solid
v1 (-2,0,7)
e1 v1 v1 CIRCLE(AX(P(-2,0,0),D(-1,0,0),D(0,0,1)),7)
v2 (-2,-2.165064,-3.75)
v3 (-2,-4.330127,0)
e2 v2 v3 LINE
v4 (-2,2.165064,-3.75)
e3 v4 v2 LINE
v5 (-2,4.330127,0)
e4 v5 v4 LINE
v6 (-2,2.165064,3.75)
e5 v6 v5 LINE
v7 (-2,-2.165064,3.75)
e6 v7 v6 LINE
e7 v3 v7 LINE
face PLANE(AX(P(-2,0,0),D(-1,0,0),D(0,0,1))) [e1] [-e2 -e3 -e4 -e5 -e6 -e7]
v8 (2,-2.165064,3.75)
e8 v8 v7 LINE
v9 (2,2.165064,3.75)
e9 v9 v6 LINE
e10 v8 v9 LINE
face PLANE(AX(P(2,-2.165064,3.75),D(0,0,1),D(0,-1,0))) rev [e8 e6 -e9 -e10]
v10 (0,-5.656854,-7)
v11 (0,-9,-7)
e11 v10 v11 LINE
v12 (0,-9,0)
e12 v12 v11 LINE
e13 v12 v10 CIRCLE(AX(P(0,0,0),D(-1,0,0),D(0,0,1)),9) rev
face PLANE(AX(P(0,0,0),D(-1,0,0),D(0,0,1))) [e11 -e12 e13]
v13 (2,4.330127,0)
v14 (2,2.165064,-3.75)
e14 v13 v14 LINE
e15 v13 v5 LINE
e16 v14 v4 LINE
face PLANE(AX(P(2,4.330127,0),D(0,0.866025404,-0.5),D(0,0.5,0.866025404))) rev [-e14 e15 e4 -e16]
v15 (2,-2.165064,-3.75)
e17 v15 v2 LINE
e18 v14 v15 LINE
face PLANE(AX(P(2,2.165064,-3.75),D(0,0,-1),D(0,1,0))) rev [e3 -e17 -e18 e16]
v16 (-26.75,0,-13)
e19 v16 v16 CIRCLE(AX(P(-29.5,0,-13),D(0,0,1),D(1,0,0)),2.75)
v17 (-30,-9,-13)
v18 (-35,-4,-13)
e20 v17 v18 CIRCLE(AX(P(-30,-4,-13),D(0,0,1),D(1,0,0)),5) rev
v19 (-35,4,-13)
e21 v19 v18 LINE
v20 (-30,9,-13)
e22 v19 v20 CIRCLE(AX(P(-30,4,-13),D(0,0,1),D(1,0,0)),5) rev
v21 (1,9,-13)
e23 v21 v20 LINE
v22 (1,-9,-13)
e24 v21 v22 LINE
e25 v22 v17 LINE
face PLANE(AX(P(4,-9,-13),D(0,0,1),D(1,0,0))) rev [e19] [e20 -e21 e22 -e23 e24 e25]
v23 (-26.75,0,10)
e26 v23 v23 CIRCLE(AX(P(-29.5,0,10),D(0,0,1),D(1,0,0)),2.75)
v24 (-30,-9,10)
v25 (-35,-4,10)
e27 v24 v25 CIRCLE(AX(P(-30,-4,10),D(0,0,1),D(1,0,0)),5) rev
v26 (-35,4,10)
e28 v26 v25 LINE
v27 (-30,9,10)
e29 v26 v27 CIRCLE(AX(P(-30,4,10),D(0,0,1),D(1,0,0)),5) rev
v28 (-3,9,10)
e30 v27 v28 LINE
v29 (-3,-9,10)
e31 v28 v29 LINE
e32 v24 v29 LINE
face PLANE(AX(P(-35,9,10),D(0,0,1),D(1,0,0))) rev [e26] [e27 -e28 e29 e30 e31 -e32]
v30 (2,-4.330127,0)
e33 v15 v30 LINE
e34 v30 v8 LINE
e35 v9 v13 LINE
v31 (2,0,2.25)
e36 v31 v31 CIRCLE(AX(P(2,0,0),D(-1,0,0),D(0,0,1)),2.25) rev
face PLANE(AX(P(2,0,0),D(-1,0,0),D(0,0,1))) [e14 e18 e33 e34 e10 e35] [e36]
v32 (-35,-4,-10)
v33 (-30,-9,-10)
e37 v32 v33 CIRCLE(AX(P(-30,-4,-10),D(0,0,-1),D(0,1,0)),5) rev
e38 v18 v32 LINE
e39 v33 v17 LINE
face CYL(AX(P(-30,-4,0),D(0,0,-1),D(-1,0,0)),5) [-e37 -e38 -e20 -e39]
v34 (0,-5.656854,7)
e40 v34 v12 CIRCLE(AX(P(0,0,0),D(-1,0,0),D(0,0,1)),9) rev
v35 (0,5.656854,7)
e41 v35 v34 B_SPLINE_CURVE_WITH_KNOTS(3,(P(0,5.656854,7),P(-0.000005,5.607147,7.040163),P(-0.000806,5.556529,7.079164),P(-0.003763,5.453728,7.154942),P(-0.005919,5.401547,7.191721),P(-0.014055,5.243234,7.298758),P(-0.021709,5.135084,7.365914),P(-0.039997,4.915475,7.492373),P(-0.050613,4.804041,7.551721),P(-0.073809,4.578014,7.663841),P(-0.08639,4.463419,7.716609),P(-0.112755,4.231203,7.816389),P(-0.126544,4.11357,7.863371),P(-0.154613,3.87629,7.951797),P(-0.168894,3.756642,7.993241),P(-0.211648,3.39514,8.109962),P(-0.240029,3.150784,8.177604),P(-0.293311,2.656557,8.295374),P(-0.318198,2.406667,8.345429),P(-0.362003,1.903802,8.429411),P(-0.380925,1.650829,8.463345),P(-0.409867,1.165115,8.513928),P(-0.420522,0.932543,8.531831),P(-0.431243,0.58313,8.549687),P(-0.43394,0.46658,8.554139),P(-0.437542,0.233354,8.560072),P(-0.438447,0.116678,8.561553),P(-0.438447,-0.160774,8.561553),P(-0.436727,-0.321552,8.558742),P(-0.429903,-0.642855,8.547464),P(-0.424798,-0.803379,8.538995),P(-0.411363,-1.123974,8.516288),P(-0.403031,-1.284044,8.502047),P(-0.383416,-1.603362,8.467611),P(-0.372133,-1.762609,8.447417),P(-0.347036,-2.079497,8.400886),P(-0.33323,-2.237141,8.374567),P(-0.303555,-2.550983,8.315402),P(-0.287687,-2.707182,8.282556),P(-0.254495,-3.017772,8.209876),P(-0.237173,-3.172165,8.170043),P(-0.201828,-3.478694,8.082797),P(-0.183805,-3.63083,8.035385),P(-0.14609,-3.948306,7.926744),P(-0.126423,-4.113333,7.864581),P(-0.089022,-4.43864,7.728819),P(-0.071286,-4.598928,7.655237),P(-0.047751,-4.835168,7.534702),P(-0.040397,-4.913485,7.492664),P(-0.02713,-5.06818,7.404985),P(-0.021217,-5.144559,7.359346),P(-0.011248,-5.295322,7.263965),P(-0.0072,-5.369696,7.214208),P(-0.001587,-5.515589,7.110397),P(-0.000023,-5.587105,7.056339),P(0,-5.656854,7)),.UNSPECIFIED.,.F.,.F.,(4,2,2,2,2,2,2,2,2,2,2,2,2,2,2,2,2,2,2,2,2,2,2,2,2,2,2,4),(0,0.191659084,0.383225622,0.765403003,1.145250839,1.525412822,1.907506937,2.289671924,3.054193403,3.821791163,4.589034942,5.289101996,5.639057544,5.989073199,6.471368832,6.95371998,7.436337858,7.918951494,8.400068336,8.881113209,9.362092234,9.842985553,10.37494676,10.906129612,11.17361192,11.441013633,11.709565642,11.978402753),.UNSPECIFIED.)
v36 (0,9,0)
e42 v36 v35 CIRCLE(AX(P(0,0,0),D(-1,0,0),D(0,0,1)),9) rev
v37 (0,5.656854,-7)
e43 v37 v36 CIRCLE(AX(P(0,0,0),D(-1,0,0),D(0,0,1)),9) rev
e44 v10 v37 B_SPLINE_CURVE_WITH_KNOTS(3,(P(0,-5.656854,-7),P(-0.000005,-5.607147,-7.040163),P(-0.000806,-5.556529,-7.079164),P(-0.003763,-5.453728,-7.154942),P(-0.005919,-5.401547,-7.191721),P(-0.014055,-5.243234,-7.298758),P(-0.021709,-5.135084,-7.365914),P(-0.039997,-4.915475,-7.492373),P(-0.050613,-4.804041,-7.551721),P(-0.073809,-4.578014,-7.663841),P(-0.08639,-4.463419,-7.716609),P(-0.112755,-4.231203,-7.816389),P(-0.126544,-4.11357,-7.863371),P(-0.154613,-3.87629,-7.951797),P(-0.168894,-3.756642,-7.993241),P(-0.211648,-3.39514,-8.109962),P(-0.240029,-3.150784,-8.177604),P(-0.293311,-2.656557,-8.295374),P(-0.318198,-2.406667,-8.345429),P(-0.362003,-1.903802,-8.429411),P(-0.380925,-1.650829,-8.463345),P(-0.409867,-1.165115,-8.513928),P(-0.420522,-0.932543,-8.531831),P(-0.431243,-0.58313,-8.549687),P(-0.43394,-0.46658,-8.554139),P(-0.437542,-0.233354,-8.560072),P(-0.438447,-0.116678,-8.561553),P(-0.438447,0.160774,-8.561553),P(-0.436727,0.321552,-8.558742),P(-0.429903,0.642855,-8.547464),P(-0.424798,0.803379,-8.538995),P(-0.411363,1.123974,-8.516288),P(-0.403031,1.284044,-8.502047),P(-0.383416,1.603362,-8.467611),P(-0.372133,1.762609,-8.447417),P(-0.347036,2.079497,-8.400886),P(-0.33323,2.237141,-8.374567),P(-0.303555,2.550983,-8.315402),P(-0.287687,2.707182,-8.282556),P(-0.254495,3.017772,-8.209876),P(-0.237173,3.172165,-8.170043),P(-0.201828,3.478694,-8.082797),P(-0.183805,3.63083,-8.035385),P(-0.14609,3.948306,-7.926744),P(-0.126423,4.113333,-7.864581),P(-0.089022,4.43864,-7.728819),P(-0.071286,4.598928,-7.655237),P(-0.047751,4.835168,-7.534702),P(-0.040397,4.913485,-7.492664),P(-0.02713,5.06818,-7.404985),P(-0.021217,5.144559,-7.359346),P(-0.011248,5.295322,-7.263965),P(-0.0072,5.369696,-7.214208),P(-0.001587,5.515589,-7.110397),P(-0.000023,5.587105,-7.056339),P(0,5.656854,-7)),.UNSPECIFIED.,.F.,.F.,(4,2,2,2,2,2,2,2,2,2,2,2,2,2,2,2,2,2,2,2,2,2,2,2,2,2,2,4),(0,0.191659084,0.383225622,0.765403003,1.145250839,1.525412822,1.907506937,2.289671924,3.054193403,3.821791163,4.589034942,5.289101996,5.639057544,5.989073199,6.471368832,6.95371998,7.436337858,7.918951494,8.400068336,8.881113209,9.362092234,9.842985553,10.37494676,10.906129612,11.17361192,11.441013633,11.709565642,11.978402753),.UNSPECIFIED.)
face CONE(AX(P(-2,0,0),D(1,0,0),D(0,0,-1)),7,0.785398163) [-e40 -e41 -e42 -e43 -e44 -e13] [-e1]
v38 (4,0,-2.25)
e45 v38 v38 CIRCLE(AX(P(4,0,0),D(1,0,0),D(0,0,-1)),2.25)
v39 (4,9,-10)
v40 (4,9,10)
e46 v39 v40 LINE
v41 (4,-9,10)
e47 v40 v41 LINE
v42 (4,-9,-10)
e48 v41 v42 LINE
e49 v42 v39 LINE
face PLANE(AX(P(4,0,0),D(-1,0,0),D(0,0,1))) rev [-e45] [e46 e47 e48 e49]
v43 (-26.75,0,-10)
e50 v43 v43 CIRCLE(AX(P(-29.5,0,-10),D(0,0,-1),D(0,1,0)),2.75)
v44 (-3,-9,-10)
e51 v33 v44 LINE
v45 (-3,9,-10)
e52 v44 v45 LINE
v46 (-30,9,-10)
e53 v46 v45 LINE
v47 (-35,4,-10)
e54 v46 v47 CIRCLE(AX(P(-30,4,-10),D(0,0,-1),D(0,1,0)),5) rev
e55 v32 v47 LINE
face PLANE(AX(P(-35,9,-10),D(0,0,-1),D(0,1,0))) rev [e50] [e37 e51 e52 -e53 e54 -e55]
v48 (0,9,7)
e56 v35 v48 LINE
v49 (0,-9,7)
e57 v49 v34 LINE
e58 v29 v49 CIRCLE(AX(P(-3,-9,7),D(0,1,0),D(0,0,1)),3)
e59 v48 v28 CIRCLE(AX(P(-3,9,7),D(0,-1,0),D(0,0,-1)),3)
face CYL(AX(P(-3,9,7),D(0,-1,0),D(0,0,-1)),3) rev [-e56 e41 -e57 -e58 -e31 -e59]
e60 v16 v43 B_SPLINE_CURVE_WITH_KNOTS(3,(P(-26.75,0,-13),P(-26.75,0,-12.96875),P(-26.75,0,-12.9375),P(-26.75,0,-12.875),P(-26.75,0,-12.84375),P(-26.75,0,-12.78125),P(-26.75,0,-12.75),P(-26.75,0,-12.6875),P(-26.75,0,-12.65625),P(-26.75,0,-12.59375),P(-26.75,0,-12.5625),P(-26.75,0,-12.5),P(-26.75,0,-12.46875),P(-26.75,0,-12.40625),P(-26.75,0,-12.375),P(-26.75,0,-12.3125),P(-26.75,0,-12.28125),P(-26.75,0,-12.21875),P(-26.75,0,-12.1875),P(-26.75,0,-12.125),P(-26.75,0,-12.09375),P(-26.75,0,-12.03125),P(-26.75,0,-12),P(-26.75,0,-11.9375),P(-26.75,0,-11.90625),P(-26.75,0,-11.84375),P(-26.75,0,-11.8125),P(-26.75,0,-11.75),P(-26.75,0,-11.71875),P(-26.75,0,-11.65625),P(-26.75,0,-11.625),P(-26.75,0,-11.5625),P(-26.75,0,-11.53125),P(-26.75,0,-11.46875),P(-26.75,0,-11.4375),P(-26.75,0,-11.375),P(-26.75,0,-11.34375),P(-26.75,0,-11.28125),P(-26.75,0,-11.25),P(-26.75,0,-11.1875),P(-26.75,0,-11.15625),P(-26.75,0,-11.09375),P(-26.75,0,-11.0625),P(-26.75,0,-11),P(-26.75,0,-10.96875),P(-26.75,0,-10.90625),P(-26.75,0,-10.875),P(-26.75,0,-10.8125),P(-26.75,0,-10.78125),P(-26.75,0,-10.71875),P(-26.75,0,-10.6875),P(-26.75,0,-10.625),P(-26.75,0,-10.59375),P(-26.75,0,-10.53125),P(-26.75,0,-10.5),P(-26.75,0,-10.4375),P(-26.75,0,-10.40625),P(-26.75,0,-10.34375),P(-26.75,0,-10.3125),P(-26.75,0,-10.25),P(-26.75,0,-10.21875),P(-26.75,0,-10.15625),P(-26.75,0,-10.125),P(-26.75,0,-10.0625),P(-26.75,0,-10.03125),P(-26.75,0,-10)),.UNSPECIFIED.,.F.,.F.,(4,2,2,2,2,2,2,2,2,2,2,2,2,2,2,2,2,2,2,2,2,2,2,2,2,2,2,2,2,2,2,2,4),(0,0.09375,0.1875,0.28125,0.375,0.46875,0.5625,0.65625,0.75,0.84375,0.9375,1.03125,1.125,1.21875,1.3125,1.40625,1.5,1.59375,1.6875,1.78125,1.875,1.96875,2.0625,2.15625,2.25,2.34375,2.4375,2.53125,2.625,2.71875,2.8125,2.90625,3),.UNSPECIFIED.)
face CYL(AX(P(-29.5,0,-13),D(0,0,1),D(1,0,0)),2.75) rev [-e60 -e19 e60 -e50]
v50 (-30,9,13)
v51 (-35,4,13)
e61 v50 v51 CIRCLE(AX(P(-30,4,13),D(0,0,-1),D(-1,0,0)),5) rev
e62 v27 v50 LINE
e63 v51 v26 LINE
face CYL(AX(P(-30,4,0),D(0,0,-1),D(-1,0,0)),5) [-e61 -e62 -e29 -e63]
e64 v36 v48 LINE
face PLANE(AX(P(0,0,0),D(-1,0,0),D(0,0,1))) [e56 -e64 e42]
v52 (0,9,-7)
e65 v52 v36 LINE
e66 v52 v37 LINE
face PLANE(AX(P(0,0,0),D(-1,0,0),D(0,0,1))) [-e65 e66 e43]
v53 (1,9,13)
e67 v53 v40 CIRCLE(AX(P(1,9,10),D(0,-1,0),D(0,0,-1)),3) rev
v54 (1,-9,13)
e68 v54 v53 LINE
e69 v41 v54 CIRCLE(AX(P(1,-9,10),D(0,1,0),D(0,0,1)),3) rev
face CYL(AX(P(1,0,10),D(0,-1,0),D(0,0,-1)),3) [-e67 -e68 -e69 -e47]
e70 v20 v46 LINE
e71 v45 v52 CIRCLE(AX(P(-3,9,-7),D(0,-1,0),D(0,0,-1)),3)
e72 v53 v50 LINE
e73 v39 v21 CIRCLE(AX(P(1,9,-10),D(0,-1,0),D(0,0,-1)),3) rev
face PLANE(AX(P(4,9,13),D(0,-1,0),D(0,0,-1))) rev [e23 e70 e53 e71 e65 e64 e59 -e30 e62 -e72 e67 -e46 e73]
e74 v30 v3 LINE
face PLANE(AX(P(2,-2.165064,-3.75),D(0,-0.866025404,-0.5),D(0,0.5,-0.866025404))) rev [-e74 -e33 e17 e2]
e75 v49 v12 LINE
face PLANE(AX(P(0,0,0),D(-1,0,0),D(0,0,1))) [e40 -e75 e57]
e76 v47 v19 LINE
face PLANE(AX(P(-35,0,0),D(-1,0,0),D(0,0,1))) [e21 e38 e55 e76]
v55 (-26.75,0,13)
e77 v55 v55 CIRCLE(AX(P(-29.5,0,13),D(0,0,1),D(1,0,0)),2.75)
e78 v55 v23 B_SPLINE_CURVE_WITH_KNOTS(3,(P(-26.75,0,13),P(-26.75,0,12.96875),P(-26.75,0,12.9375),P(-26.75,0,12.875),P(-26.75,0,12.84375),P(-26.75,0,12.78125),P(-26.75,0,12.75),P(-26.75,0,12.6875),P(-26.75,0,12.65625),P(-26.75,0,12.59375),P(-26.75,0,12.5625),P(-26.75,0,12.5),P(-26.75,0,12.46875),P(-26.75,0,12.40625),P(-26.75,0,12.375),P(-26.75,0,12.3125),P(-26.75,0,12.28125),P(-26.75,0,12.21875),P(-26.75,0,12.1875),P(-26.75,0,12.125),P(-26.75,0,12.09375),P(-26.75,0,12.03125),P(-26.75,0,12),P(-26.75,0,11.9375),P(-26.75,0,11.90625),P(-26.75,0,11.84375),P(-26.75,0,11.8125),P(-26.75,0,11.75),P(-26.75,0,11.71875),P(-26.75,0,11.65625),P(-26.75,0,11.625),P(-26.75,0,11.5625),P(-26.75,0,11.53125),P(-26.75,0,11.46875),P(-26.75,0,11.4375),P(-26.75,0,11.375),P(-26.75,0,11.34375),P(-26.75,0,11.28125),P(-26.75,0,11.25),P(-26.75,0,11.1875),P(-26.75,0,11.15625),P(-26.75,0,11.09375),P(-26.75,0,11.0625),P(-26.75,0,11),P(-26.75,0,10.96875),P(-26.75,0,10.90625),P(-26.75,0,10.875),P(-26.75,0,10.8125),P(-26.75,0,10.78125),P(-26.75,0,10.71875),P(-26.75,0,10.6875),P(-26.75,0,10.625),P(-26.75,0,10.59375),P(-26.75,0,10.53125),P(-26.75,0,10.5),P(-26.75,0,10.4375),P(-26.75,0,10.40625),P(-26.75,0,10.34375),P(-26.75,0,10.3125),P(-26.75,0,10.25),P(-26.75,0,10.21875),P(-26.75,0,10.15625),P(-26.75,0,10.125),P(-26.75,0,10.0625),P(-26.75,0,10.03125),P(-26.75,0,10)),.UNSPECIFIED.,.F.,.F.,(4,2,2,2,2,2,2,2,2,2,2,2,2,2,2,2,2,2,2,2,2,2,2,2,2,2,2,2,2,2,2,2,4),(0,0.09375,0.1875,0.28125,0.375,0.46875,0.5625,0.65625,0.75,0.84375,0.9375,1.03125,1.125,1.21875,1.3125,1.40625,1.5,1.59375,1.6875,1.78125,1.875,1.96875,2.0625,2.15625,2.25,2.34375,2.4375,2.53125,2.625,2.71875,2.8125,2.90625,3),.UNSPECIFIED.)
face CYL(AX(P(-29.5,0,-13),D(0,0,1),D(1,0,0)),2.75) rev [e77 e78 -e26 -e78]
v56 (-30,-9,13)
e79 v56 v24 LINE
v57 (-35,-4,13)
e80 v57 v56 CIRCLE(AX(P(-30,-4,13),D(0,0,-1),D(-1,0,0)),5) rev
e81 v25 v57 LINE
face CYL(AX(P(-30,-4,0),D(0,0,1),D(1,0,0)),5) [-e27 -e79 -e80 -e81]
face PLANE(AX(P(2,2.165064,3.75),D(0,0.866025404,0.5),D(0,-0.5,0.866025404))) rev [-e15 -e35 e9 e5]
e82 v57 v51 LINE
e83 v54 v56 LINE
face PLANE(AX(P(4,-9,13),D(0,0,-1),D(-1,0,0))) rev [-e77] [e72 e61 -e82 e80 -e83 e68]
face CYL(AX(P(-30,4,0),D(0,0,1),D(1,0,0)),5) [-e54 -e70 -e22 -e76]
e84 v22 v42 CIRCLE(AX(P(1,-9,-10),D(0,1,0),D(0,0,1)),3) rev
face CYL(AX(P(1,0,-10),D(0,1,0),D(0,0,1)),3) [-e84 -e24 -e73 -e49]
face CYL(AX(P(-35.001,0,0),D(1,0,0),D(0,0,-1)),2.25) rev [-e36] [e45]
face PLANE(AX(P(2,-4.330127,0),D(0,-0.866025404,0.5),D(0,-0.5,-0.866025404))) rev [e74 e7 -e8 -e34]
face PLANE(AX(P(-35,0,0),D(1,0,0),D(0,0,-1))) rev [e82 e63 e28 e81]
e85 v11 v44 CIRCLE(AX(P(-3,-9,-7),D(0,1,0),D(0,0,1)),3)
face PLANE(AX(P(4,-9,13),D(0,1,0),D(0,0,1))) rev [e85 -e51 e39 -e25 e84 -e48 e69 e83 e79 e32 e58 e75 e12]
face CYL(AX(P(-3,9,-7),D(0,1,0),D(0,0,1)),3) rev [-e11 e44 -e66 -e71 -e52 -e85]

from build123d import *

# Parameters (mm, degrees)
SKETCH1_W           = 26
SKETCH1_H           = 18
BOSS_EXTRUDE1_DEPTH = 4
SKETCH2_W           = 3
SKETCH2_H           = 18
BOSS_EXTRUDE2_DEPTH = 35
SKETCH3_R           = 2.75
CUT_EXTRUDE1_DEPTH  = 45.519658579
FILLET1_R           = 3
FILLET2_R           = 5
SKETCH5_R           = 7
BOSS_EXTRUDE3_DEPTH = 2
CUT_EXTRUDE3_REACH  = 44.083
SKETCH7_R           = 2.25
CUT_EXTRUDE4_DEPTH  = 4
CHAMFER1_SIZE       = 2


with BuildPart() as part:
    # Sketch1 → Boss-Extrude1 (new body)
    with BuildSketch(Plane(origin=(0, 0, 0), x_dir=(0, 0, -1), z_dir=(1, 0, 0))):
        Rectangle(SKETCH1_W, SKETCH1_H)
    extrude(amount=BOSS_EXTRUDE1_DEPTH)

    # Sketch2 → Boss-Extrude2 (add)
    with BuildSketch(Plane.ZY):
        with Locations((-11.5, 0)):
            Rectangle(SKETCH2_W, SKETCH2_H)
        with Locations((11.5, 0)):
            Rectangle(SKETCH2_W, SKETCH2_H)
    extrude(amount=BOSS_EXTRUDE2_DEPTH)

    # Sketch3 → Cut-Extrude1 (cut, through all)
    with BuildSketch(Plane.XY.offset(13)):
        with Locations((-29.5, 0)):
            Circle(SKETCH3_R)
    extrude(amount=-CUT_EXTRUDE1_DEPTH, mode=Mode.SUBTRACT)

    # Fillet1
    fillet1_edges = [part.edges().sort_by_distance(p)[0] for p in [
        (4, 0, 13),
        (0, 0, -10),
        (0, 0, 10),
        (4, 0, -13),
    ]]
    fillet(fillet1_edges, radius=FILLET1_R)

    # Fillet2
    fillet2_edges = [part.edges().sort_by_distance(p)[0] for p in [
        (-35, -9, -11.5),
        (-35, 9, -11.5),
        (-35, 9, 11.5),
        (-35, -9, 11.5),
    ]]
    fillet(fillet2_edges, radius=FILLET2_R)

    # Sketch5 → Boss-Extrude3 (add)
    with BuildSketch(Plane.ZY):
        Circle(SKETCH5_R)
    extrude(amount=BOSS_EXTRUDE3_DEPTH)

    # Sketch7 → Cut-Extrude3 (cut, up to next)
    with BuildSketch(Plane(origin=(4, 0, 0), x_dir=(0, 0, -1), z_dir=(1, 0, 0)), mode=Mode.PRIVATE) as cut_extrude3_sk1:
        Circle(SKETCH7_R)
    cut_extrude3_tool1 = extrude(cut_extrude3_sk1.sketch, amount=-CUT_EXTRUDE3_REACH, mode=Mode.PRIVATE) & part.part
    add(cut_extrude3_tool1.solids().sort_by_distance((4, 0, 0))[0], mode=Mode.SUBTRACT)

    # Sketch8 → Cut-Extrude4 (cut)
    with BuildSketch(Plane.ZY.offset(2)):
        Polygon((0, 4.330127019), (-3.75, 2.165063509), (-3.75, -2.165063509), (0, -4.330127019), (3.75, -2.165063509), (3.75, 2.165063509), align=None)
    extrude(amount=-CUT_EXTRUDE4_DEPTH, mode=Mode.SUBTRACT)

    # Chamfer1
    # the kernel refuses this chamfer: 2 mm, written as the material it adds along each edge
    with BuildSketch(Plane(origin=(0, 0, 0), x_dir=(0, 0, 1), z_dir=(0, -1, 0))) as chamfer1_piece_1_section:
        Polygon((7 + CHAMFER1_SIZE, 0), (7, CHAMFER1_SIZE), (7, 0), align=None)
    chamfer1_piece_1 = revolve(axis=Axis((0, 0, 0), (-1, 0, 0)), revolution_arc=180.000000041, mode=Mode.PRIVATE)
    chamfer1_piece_1 = split(chamfer1_piece_1, bisect_by=Plane(origin=(-0.945175713, 9, -3e-09), z_dir=(0, -1, 0)), keep=Keep.TOP, mode=Mode.PRIVATE)
    chamfer1_piece_1 = split(chamfer1_piece_1, bisect_by=Plane(origin=(-2, 8.001744255, -3e-09), z_dir=(1, 0, 0)), keep=Keep.TOP, mode=Mode.PRIVATE)
    add(chamfer1_piece_1)
    with BuildSketch(Plane(origin=(0, 0, 0), x_dir=(0, -7.23525117256177e-10, -1.0), z_dir=(0, 1.0, -7.23525117256177e-10))) as chamfer1_piece_2_section:
        Polygon((7 + CHAMFER1_SIZE, 0), (7, CHAMFER1_SIZE), (7, 0), align=None)
    chamfer1_piece_2 = revolve(axis=Axis((0, 0, 0), (-1, 0, 0)), revolution_arc=179.999999959, mode=Mode.PRIVATE)
    chamfer1_piece_2 = split(chamfer1_piece_2, bisect_by=Plane(origin=(-0.945175715, -9, 3e-09), z_dir=(0, 1, 0)), keep=Keep.TOP, mode=Mode.PRIVATE)
    chamfer1_piece_2 = split(chamfer1_piece_2, bisect_by=Plane(origin=(-2, -8.001744258, 3e-09), z_dir=(1, 0, 0)), keep=Keep.TOP, mode=Mode.PRIVATE)
    add(chamfer1_piece_2)


solid = part.part
